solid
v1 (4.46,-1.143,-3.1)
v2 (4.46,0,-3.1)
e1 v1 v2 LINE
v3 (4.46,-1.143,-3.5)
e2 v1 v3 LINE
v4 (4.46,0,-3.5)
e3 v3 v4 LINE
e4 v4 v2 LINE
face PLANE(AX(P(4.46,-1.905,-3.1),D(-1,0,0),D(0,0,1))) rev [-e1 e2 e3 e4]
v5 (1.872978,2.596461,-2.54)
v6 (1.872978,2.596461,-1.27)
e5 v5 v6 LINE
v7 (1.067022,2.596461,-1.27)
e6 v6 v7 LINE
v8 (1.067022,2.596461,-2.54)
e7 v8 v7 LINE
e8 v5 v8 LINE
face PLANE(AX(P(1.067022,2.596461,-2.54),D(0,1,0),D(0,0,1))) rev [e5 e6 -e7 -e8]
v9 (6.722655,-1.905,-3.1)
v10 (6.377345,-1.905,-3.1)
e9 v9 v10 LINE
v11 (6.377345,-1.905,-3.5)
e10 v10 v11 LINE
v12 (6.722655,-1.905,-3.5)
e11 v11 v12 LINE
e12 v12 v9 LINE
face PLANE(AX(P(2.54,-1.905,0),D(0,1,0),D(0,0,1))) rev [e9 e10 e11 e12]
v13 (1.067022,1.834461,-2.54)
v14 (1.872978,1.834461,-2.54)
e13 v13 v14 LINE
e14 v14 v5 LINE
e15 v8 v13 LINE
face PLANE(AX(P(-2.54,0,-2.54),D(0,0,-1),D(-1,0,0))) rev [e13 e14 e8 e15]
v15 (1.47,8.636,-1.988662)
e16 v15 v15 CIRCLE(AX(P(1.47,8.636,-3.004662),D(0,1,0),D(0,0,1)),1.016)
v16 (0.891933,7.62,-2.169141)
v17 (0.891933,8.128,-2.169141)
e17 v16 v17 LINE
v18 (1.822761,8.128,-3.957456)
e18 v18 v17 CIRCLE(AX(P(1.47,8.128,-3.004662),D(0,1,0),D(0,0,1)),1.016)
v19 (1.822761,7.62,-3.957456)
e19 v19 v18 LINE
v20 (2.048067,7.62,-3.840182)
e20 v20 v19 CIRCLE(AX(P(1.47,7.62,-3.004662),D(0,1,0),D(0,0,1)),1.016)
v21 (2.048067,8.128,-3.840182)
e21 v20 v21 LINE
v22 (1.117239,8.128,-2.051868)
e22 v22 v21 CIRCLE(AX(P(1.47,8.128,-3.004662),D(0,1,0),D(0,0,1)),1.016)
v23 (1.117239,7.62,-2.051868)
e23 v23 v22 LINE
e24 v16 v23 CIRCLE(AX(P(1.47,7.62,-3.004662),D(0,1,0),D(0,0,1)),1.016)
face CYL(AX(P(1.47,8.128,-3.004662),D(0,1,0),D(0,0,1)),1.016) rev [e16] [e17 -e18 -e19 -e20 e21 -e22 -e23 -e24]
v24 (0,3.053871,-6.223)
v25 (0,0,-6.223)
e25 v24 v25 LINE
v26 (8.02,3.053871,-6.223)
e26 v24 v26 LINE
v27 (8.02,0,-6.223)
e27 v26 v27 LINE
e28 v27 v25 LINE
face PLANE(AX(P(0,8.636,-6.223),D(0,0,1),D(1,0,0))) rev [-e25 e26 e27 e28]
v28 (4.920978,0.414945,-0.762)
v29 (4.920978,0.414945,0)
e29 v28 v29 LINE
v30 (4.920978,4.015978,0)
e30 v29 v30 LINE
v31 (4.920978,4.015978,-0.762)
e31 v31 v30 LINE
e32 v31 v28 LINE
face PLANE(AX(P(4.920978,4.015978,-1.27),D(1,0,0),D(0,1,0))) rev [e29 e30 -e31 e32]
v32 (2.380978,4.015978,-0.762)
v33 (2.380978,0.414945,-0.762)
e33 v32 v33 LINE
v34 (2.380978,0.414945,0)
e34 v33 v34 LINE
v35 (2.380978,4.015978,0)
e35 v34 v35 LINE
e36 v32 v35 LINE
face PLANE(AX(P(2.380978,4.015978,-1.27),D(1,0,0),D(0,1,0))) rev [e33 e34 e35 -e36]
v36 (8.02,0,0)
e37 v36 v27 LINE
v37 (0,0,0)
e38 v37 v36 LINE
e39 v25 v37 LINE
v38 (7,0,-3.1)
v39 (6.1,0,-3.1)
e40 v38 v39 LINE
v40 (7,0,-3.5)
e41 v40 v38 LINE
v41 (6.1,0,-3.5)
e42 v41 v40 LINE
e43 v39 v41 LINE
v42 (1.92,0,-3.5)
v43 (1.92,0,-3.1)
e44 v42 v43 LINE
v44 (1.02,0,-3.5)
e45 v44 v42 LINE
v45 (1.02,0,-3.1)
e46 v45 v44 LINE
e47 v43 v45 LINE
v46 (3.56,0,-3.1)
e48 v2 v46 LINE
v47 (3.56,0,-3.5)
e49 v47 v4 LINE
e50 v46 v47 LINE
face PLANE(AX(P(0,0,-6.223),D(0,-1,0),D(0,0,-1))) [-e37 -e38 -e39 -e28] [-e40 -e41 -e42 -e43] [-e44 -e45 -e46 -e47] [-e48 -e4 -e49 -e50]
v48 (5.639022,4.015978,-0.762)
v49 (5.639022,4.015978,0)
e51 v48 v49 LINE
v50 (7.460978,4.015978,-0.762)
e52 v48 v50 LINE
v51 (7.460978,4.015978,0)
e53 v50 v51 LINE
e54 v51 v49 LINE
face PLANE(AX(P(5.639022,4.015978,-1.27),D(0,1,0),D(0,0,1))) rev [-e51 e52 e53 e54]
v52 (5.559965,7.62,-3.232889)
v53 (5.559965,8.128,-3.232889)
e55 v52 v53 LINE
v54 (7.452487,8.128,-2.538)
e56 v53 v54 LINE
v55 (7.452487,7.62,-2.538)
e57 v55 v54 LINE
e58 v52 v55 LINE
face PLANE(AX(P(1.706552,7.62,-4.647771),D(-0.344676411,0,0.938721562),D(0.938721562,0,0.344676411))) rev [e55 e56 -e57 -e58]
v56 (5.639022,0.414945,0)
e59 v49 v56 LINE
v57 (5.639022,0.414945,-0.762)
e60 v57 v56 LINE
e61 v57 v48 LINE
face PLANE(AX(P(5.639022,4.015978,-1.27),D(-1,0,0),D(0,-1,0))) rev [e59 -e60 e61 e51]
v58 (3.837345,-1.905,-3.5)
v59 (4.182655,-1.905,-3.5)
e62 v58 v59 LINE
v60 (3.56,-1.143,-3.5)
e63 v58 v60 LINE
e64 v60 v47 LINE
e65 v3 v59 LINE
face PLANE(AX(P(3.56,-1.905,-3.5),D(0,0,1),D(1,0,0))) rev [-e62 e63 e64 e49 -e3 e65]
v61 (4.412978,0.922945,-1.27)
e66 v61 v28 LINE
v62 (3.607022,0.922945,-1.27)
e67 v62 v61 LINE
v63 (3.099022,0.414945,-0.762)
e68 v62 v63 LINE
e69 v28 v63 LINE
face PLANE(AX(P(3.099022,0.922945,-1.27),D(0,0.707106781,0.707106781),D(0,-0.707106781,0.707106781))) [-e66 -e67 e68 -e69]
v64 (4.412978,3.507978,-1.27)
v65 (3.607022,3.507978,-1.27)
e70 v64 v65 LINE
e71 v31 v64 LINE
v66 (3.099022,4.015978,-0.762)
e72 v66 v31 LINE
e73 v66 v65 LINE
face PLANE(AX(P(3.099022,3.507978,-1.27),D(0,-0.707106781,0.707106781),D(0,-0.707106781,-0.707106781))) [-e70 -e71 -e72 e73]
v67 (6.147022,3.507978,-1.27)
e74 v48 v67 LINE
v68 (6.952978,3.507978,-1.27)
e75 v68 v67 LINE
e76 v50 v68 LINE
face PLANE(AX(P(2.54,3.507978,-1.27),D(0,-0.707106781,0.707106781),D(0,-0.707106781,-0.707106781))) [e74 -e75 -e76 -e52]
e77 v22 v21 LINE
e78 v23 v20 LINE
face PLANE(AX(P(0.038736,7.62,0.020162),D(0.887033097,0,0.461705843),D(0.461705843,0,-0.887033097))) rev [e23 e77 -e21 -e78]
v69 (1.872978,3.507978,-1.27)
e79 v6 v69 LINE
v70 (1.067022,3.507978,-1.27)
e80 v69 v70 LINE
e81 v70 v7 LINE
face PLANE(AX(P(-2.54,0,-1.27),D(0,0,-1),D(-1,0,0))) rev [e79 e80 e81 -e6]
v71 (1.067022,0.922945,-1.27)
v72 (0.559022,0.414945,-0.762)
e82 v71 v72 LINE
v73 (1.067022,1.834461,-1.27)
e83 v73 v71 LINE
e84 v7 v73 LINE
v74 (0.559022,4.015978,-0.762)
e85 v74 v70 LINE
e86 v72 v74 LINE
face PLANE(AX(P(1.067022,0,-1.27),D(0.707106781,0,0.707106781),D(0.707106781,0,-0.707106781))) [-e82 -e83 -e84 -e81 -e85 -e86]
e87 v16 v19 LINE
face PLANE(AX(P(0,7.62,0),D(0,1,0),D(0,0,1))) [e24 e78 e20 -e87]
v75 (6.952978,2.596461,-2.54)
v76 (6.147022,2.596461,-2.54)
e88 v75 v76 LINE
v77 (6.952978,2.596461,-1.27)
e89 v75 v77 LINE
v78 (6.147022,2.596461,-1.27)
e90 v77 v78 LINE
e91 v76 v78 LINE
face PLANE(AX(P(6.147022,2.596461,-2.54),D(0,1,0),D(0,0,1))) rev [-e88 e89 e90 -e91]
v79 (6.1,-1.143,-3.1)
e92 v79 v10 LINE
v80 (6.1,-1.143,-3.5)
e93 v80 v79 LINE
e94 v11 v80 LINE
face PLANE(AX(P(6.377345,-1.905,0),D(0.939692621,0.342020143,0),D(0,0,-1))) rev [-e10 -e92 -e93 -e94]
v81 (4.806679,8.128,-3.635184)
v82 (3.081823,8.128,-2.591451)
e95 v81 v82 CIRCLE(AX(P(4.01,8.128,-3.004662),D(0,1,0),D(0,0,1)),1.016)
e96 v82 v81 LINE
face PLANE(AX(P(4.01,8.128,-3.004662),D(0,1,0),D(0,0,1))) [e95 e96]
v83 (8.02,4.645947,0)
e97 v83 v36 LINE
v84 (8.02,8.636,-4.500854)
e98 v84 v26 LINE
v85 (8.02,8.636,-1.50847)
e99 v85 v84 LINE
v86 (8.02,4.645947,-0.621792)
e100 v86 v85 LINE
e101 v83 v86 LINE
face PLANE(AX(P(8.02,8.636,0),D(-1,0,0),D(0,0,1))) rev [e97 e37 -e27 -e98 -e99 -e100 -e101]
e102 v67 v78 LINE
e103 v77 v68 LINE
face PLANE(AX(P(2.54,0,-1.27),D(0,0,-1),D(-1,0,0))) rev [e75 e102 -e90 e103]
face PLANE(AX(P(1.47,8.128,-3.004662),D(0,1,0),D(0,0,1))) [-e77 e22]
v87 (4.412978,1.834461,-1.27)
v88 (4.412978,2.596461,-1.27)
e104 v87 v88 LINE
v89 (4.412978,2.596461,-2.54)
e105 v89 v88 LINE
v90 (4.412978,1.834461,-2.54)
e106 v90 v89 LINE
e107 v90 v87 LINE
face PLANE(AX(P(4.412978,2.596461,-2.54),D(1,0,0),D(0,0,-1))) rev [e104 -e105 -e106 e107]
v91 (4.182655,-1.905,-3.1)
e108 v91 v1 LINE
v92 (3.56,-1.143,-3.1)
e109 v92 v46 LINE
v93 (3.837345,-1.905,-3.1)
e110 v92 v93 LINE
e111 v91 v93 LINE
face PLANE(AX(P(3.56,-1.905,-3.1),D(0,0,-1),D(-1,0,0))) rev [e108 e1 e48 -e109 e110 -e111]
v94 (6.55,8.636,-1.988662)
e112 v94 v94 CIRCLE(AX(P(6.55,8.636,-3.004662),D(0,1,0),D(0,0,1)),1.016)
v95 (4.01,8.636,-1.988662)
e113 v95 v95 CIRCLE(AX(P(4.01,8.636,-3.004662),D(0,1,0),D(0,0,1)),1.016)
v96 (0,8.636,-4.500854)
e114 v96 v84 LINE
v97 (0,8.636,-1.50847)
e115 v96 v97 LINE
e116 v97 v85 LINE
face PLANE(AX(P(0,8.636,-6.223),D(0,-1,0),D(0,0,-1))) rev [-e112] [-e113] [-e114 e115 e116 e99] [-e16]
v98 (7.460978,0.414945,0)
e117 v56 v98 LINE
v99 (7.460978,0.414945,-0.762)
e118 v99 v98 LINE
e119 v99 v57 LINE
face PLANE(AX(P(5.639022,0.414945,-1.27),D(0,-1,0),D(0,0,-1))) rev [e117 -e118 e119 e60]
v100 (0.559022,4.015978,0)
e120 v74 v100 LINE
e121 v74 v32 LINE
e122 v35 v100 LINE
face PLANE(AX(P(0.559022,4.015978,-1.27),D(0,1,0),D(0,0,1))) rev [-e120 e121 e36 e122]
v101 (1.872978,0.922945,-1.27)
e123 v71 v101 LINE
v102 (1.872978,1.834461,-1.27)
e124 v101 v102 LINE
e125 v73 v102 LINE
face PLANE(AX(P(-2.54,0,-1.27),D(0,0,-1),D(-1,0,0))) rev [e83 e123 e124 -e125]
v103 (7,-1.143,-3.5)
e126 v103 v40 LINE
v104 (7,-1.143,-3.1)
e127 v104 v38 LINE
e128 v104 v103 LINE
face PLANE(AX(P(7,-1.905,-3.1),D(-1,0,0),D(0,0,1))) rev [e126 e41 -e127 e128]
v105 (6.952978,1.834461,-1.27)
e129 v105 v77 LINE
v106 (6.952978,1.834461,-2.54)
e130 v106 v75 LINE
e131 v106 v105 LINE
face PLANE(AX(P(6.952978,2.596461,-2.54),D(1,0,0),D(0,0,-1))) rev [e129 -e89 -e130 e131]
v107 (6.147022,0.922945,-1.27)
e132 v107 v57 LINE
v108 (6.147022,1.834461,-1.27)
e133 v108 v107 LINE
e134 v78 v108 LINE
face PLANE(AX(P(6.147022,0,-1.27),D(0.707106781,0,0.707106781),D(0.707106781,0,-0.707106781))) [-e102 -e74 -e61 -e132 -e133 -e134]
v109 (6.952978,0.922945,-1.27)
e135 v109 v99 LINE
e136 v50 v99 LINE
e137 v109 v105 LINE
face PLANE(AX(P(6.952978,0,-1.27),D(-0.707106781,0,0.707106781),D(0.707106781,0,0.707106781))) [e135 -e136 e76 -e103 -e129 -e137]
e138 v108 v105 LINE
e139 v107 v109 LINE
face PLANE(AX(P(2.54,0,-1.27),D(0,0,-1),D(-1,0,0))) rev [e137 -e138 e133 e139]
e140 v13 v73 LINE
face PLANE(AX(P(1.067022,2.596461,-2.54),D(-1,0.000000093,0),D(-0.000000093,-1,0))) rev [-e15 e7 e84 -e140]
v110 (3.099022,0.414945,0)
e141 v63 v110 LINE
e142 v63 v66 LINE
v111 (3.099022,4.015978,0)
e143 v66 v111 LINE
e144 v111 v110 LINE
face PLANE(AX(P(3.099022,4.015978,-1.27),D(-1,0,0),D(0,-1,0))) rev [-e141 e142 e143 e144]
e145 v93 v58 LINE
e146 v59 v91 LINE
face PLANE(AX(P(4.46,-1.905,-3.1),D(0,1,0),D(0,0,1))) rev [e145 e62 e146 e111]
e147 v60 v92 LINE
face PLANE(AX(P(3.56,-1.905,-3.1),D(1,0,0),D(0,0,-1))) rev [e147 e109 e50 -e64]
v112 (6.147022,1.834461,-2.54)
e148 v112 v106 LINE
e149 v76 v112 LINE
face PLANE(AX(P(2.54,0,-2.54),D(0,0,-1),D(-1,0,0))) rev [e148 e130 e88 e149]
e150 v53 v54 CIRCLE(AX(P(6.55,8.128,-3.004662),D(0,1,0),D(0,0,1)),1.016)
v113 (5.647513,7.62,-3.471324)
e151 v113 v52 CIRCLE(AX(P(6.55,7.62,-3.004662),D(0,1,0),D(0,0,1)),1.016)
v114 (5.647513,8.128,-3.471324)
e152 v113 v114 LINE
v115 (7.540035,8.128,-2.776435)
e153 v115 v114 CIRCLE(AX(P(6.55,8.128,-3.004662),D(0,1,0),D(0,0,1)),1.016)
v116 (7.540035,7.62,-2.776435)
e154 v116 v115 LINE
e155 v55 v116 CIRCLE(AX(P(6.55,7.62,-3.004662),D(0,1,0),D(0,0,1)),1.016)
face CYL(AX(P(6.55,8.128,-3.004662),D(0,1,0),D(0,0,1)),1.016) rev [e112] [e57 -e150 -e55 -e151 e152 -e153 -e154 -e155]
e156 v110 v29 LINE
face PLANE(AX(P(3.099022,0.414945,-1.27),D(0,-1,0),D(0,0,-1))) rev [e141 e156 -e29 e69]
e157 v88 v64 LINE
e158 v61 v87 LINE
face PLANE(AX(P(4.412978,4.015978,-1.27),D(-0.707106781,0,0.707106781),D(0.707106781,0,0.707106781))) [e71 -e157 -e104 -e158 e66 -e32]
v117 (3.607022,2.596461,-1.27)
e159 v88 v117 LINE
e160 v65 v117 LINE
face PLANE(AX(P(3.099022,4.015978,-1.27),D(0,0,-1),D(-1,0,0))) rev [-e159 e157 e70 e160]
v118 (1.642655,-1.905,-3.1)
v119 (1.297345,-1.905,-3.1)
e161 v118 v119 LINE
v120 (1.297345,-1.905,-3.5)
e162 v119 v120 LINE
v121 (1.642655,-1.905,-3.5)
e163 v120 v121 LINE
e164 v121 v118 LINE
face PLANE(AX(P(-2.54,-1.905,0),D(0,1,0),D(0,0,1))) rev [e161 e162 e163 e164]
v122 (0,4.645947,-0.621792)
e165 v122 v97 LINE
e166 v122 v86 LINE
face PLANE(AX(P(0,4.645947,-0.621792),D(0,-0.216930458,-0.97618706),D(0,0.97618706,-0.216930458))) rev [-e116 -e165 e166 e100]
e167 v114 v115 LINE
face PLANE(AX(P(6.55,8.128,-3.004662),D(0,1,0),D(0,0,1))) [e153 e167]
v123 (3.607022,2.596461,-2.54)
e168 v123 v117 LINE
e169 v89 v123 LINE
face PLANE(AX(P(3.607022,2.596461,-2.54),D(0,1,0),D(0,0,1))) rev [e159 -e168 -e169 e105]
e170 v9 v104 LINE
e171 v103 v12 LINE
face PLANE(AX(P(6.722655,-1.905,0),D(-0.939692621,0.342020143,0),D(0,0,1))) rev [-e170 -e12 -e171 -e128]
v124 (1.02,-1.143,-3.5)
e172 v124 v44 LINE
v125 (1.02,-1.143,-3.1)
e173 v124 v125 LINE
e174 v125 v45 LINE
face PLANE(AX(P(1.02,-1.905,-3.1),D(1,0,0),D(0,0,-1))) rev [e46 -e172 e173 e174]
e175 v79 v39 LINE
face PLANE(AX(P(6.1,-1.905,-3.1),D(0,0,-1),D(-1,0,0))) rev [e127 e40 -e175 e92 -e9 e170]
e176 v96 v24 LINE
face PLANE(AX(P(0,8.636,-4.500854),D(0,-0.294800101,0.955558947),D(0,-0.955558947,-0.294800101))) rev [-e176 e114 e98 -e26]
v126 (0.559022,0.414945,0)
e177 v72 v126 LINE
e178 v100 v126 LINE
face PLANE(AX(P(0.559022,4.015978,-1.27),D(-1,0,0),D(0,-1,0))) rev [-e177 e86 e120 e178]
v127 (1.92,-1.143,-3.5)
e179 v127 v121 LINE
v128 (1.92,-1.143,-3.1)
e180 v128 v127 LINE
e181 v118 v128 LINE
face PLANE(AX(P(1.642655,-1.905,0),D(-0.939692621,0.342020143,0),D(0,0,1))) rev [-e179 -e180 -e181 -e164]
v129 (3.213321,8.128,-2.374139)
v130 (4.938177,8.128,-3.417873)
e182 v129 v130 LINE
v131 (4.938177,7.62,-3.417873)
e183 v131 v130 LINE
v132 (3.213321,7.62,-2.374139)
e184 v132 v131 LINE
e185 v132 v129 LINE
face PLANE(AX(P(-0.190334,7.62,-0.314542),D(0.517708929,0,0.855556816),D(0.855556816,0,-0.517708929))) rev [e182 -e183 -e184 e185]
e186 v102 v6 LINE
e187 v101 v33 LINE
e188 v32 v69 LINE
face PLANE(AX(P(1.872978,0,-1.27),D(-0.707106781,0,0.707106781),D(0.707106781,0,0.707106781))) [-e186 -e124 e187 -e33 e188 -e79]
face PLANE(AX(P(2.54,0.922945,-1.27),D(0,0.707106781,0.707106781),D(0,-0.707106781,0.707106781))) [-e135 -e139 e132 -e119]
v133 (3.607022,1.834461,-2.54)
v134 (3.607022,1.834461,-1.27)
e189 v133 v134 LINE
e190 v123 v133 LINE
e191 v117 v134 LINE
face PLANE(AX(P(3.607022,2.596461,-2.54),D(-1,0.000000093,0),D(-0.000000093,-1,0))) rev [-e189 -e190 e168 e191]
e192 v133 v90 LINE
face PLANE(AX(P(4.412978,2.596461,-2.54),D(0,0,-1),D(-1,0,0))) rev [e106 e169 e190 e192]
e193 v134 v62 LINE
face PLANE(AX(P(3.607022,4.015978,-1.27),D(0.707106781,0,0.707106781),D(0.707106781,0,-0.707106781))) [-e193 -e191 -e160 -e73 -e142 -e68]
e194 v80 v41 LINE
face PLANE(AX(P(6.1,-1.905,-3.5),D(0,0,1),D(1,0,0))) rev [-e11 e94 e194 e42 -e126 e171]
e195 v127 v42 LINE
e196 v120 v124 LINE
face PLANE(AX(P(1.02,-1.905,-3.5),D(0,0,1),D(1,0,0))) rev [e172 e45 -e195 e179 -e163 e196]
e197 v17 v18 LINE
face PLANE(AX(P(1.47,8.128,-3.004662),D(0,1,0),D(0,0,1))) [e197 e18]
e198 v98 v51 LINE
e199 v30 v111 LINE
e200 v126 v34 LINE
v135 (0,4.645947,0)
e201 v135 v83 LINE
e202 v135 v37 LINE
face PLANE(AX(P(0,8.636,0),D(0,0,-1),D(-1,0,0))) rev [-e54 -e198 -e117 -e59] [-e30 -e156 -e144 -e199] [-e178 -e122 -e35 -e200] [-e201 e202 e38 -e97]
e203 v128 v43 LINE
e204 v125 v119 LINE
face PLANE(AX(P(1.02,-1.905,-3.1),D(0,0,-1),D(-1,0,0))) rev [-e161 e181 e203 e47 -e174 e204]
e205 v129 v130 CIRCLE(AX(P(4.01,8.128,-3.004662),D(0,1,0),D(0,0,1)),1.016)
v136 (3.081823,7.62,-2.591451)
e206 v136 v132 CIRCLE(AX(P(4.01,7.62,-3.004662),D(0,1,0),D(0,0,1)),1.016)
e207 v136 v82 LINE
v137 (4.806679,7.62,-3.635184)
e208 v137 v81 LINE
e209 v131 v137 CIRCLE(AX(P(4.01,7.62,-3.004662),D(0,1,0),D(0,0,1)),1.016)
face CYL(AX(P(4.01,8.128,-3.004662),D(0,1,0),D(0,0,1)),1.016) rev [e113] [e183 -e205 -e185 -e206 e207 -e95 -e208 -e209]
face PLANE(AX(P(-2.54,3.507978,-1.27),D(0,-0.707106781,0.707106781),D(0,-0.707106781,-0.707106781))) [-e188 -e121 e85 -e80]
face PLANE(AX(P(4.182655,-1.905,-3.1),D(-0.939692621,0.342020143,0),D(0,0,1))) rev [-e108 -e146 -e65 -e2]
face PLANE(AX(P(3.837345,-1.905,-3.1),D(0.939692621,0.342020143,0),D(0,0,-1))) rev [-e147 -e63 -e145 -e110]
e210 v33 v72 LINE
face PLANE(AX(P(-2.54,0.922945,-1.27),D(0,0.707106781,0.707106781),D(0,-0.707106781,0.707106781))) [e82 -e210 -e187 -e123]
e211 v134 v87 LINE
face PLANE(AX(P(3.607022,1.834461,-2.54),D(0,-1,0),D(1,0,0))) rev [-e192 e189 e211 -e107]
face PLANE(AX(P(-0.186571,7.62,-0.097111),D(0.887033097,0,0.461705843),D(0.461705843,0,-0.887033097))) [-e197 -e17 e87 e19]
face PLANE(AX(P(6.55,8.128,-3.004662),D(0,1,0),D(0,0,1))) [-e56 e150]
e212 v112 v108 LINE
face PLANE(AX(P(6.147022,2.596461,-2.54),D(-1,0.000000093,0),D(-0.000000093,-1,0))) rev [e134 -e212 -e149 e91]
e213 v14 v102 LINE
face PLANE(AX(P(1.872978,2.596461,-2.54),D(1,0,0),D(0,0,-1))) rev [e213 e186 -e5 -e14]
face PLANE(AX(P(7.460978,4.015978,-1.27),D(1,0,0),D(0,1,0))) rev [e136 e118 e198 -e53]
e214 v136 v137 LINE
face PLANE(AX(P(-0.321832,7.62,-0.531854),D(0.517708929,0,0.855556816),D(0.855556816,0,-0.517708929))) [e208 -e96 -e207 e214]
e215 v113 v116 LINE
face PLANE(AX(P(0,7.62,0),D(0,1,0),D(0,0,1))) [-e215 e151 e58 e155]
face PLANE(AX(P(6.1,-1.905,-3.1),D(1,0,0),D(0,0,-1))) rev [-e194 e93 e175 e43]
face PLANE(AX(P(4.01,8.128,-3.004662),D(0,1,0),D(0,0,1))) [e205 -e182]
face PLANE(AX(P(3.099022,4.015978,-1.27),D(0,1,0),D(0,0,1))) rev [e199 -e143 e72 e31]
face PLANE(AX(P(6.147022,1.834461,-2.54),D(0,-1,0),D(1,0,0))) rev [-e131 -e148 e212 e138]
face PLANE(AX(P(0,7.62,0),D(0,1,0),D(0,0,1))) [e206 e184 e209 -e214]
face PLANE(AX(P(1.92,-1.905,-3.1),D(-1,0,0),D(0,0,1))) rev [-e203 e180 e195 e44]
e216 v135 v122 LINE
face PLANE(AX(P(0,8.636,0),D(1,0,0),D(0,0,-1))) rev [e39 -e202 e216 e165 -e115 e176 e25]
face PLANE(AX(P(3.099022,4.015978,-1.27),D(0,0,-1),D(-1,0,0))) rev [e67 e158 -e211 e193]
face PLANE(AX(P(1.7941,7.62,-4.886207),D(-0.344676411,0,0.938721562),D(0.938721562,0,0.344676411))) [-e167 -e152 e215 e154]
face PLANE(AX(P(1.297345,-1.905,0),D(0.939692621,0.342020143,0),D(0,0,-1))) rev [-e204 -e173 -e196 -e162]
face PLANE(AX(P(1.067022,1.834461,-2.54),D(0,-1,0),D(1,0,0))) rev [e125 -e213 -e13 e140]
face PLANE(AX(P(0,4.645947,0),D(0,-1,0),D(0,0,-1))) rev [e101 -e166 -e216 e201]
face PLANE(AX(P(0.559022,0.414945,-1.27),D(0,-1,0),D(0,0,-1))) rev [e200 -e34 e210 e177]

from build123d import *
from OCP.BRepFilletAPI import BRepFilletAPI_MakeChamfer
from build123d.topology import SkipClean

# Parameters (mm, degrees)
SKETCH1_W             = 8.02
SKETCH1_H             = 6.223
EXTRUDE1_DEPTH        = 8.636
CUT_EXTRUDE1_DEPTH    = 14.327663899
CUT_EXTRUDE2_DEPTH    = 14.327663899
SKETCH4_R             = 1.016
CUT_EXTRUDE3_DEPTH    = 0.508
SKETCH6_W             = 1.82195597
SKETCH6_H             = 3.601033201
CUT_EXTRUDE5_DEPTH    = 1.27
CHAMFER1_SIZE         = 0.508
CUT_EXTRUDE6_DEPTH    = 1.27
SKETCH8_W             = 0.9
SKETCH8_H             = 0.4
EXTRUDE2_DEPTH        = 1.905
CHAMFER2_SIZE         = 0.762
CHAMFER2_SIZE2        = 0.277345319
LPATTERN1_START       = 0.41494466
LPATTERN1_DEPTH       = 3.601033201
LPATTERN1_START_2     = 8.128
LPATTERN1_2_OUTLINE_R = 1.016
LPATTERN1_2_DEPTH     = 0.508
LPATTERN1_START_3     = 1.83446126
LPATTERN1_3_DEPTH     = 0.762
LPATTERN1_START_4     = -1.143
LPATTERN1_4_OUTLINE_W = 0.9
LPATTERN1_4_OUTLINE_H = 0.4
LPATTERN1_4_DEPTH     = 1.55794466
LPATTERN1_START_5     = -3.5
LPATTERN1_5_DEPTH     = 0.4
LPATTERN1_6_DEPTH     = 8
CUT_EXTRUDE4_START    = -0.508
CUT_EXTRUDE4_DEPTH    = 0.508


with BuildPart() as part:
    # Sketch1 → Extrude1 (new body)
    with BuildSketch(Plane(origin=(0, 0, 0), x_dir=(1, 0, 0), z_dir=(0, 1, 0))):
        with Locations((4.01, 3.1115)):
            Rectangle(SKETCH1_W, SKETCH1_H)
    extrude(amount=EXTRUDE1_DEPTH)

    # Sketch2 → Cut-Extrude1 (cut, through all)
    with BuildSketch(Plane(origin=(8.02, 0, 0), x_dir=(0, 0, -1), z_dir=(1, 0, 0))):
        Polygon((0, 4.645946632), (0.62179162, 4.645946632), (1.508470146, 8.636), (0, 8.636), align=None)
    extrude(amount=-CUT_EXTRUDE1_DEPTH, mode=Mode.SUBTRACT)

    # Sketch3 → Cut-Extrude2 (cut, through all)
    with BuildSketch(Plane(origin=(8.02, 0, 0), x_dir=(0, 0, -1), z_dir=(1, 0, 0))):
        Polygon((4.500853694, 8.636), (6.223, 3.053870593), (6.223, 8.636), align=None)
    extrude(amount=-CUT_EXTRUDE2_DEPTH, mode=Mode.SUBTRACT)

    # Sketch4 → Cut-Extrude3 (cut)
    with BuildSketch(Plane(origin=(0, 8.636, 0), x_dir=(1, 0, 0), z_dir=(0, 1, 0))):
        with Locations(Location((4.01, 3.00466192, 0), (0, 0, 270))):
            Circle(SKETCH4_R)
    extrude(amount=-CUT_EXTRUDE3_DEPTH, mode=Mode.SUBTRACT)

    # Sketch6 → Cut-Extrude5 (cut)
    with BuildSketch(Plane.XY):
        with Locations((4.01, 2.215461261)):
            Rectangle(SKETCH6_W, SKETCH6_H)
    extrude(amount=-CUT_EXTRUDE5_DEPTH, mode=Mode.SUBTRACT)

    # Chamfer1
    chamfer1_edges = [part.edges().sort_by_distance(p)[0] for p in [
        (4.01, 4.015977861, -1.27),
        (4.920977985, 2.21546126, -1.27),
        (4.01, 0.41494466, -1.27),
        (3.099022015, 2.21546126, -1.27),
    ]]
    chamfer(chamfer1_edges, length=CHAMFER1_SIZE)

    # Sketch7 → Cut-Extrude6 (cut)
    with BuildSketch(Plane.XY.offset(-1.27)):
        Polygon((3.607022015, 2.59646126), (3.607021944, 1.83446126), (4.412977985, 1.83446126), (4.412977985, 2.59646126), align=None)
    extrude(amount=-CUT_EXTRUDE6_DEPTH, mode=Mode.SUBTRACT)

    # Sketch8 → Extrude2 (add)
    with BuildSketch(Plane.XZ):
        with Locations((4.01, -3.3)):
            Rectangle(SKETCH8_W, SKETCH8_H)
    extrude(amount=EXTRUDE2_DEPTH)

    # Chamfer2: one chamfer whose edges measure the first distance from different faces: ONE call of the kernel's chamfer builder (chamfer() names one face for all edges)
    chamfer2_edges_1 = [part.edges().sort_by_distance(p)[0] for p in [
        (3.56, -1.905, -3.3),
    ]]
    chamfer2_side_1 = [part.faces().sort_by_distance(p)[0] for p in [
        (3.56, -0.9525, -3.3),
    ]]
    chamfer2_edges_2 = [part.edges().sort_by_distance(p)[0] for p in [
        (4.46, -1.905, -3.3),
    ]]
    chamfer2_side_2 = [part.faces().sort_by_distance(p)[0] for p in [
        (4.46, -0.9525, -3.3),
    ]]
    chamfer2 = BRepFilletAPI_MakeChamfer(part.part.solid().wrapped)
    for e in chamfer2_edges_1:
        chamfer2.Add(CHAMFER2_SIZE, CHAMFER2_SIZE2, e.wrapped, chamfer2_side_1[0].wrapped)  # the first distance lies on this face
    for e in chamfer2_edges_2:
        chamfer2.Add(CHAMFER2_SIZE, CHAMFER2_SIZE2, e.wrapped, chamfer2_side_2[0].wrapped)  # the first distance lies on this face
    add(Compound.cast(chamfer2.Shape()), mode=Mode.REPLACE)

    # LPattern1: read off the stored shape, not the designer's step
    # LPattern1 outline → LPattern1 (cut)
    with BuildSketch(Plane(origin=(0, 0, 0), x_dir=(1, 0, 0), z_dir=(0, 1, 0)).offset(LPATTERN1_START)):
        Polygon((7.460977985, 0.762), (6.952977985, 1.27), (6.147022015, 1.27), (5.639022015, 0.762), (5.639022015, 0), (7.460977985, 0), align=None)
        Polygon((0.559022015, 0), (2.380977985, 0), (2.380977985, 0.762), (1.872977985, 1.27), (1.067022015, 1.27), (0.559022015, 0.762), align=None)
    extrude(amount=LPATTERN1_DEPTH, mode=Mode.SUBTRACT)

    # LPattern1 2 outline → LPattern1 2 (cut)
    with BuildSketch(Plane(origin=(0, 0, 0), x_dir=(1, 0, 0), z_dir=(0, 1, 0)).offset(LPATTERN1_START_2)):
        with Locations((6.55, 3.00466192)):
            Circle(LPATTERN1_2_OUTLINE_R)
        with Locations((1.47, 3.00466192)):
            Circle(LPATTERN1_2_OUTLINE_R)
    extrude(amount=LPATTERN1_2_DEPTH, mode=Mode.SUBTRACT)

    # LPattern1 3 outline → LPattern1 3 (cut)
    with BuildSketch(Plane(origin=(0, 0, 0), x_dir=(1, 0, 0), z_dir=(0, 1, 0)).offset(LPATTERN1_START_3)):
        Polygon((6.147022015, 1.27), (6.952977985, 1.27), (6.952977985, 2.54), (6.147021944, 2.54), align=None)
        Polygon((1.067022015, 1.27), (1.872977985, 1.27), (1.872977985, 2.54), (1.067021944, 2.54), align=None)
    extrude(amount=LPATTERN1_3_DEPTH, mode=Mode.SUBTRACT)

    # LPattern1 4 outline → LPattern1 4 (add)
    with BuildSketch(Plane(origin=(0, 0, 0), x_dir=(1, 0, 0), z_dir=(0, 1, 0)).offset(LPATTERN1_START_4)):
        with Locations((1.47, 3.3)):
            Rectangle(LPATTERN1_4_OUTLINE_W, LPATTERN1_4_OUTLINE_H)
        with Locations((6.55, 3.3)):
            Rectangle(LPATTERN1_4_OUTLINE_W, LPATTERN1_4_OUTLINE_H)
    extrude(amount=LPATTERN1_4_DEPTH)

    # LPattern1 5 outline → LPattern1 5 (add)
    with BuildSketch(Plane.XY.offset(LPATTERN1_START_5)):
        Polygon((1.297345319, -1.905), (1.642654681, -1.905), (1.92, -1.143), (1.02, -1.143), align=None)
        Polygon((6.377345319, -1.905), (6.722654681, -1.905), (7, -1.143), (6.1, -1.143), align=None)
    extrude(amount=LPATTERN1_5_DEPTH)

    # LPattern1 6 outline → LPattern1 6 (add)
    with BuildSketch(Plane.YZ):
        Polygon((0.41494466, -1.27), (0.92294466, -1.27), (0.41494466, -0.762), align=None)
        Polygon((4.015977861, -1.27), (4.015977861, -0.762), (3.507977861, -1.27), align=None)
    extrude(amount=LPATTERN1_6_DEPTH)

    # Sketch5 → Cut-Extrude4 (cut)
    with SkipClean():  # the faces are left unmerged after this step: merging them gives an invalid solid
        with BuildSketch(Plane(origin=(0, 8.128, 0), x_dir=(1, 0, 0), z_dir=(0, 1, 0)).offset(CUT_EXTRUDE4_START)):
            with BuildLine():
                ThreePointArc((5.647513235, 3.471324151), (5.596258893, 3.354853153), (5.559965426, 3.232888875))
                Line((5.559965426, 3.232888875), (7.452486765, 2.537999689))
                ThreePointArc((7.452486765, 2.537999689), (7.503741107, 2.654470687), (7.540034574, 2.776434965))
                Line((7.540034574, 2.776434965), (5.647513235, 3.471324151))
            make_face()
            with BuildLine():
                ThreePointArc((3.08182296, 2.591450857), (3.140754275, 2.478669649), (3.213321028, 2.374139426))
                Line((3.213321028, 2.374139426), (4.93817704, 3.417872983))
                ThreePointArc((4.93817704, 3.417872983), (4.879245725, 3.530654191), (4.806678972, 3.635184414))
                Line((4.806678972, 3.635184414), (3.08182296, 2.591450857))
            make_face()
            with BuildLine():
                ThreePointArc((0.891932879, 2.169141481), (1.000906863, 2.103436294), (1.117239285, 2.051868197))
                Line((1.117239285, 2.051868197), (2.048067121, 3.840182359))
                ThreePointArc((2.048067121, 3.840182359), (1.939093137, 3.905887546), (1.822760715, 3.957455643))
                Line((1.822760715, 3.957455643), (0.891932879, 2.169141481))
            make_face()
        extrude(amount=CUT_EXTRUDE4_DEPTH, mode=Mode.SUBTRACT)


solid = part.part
